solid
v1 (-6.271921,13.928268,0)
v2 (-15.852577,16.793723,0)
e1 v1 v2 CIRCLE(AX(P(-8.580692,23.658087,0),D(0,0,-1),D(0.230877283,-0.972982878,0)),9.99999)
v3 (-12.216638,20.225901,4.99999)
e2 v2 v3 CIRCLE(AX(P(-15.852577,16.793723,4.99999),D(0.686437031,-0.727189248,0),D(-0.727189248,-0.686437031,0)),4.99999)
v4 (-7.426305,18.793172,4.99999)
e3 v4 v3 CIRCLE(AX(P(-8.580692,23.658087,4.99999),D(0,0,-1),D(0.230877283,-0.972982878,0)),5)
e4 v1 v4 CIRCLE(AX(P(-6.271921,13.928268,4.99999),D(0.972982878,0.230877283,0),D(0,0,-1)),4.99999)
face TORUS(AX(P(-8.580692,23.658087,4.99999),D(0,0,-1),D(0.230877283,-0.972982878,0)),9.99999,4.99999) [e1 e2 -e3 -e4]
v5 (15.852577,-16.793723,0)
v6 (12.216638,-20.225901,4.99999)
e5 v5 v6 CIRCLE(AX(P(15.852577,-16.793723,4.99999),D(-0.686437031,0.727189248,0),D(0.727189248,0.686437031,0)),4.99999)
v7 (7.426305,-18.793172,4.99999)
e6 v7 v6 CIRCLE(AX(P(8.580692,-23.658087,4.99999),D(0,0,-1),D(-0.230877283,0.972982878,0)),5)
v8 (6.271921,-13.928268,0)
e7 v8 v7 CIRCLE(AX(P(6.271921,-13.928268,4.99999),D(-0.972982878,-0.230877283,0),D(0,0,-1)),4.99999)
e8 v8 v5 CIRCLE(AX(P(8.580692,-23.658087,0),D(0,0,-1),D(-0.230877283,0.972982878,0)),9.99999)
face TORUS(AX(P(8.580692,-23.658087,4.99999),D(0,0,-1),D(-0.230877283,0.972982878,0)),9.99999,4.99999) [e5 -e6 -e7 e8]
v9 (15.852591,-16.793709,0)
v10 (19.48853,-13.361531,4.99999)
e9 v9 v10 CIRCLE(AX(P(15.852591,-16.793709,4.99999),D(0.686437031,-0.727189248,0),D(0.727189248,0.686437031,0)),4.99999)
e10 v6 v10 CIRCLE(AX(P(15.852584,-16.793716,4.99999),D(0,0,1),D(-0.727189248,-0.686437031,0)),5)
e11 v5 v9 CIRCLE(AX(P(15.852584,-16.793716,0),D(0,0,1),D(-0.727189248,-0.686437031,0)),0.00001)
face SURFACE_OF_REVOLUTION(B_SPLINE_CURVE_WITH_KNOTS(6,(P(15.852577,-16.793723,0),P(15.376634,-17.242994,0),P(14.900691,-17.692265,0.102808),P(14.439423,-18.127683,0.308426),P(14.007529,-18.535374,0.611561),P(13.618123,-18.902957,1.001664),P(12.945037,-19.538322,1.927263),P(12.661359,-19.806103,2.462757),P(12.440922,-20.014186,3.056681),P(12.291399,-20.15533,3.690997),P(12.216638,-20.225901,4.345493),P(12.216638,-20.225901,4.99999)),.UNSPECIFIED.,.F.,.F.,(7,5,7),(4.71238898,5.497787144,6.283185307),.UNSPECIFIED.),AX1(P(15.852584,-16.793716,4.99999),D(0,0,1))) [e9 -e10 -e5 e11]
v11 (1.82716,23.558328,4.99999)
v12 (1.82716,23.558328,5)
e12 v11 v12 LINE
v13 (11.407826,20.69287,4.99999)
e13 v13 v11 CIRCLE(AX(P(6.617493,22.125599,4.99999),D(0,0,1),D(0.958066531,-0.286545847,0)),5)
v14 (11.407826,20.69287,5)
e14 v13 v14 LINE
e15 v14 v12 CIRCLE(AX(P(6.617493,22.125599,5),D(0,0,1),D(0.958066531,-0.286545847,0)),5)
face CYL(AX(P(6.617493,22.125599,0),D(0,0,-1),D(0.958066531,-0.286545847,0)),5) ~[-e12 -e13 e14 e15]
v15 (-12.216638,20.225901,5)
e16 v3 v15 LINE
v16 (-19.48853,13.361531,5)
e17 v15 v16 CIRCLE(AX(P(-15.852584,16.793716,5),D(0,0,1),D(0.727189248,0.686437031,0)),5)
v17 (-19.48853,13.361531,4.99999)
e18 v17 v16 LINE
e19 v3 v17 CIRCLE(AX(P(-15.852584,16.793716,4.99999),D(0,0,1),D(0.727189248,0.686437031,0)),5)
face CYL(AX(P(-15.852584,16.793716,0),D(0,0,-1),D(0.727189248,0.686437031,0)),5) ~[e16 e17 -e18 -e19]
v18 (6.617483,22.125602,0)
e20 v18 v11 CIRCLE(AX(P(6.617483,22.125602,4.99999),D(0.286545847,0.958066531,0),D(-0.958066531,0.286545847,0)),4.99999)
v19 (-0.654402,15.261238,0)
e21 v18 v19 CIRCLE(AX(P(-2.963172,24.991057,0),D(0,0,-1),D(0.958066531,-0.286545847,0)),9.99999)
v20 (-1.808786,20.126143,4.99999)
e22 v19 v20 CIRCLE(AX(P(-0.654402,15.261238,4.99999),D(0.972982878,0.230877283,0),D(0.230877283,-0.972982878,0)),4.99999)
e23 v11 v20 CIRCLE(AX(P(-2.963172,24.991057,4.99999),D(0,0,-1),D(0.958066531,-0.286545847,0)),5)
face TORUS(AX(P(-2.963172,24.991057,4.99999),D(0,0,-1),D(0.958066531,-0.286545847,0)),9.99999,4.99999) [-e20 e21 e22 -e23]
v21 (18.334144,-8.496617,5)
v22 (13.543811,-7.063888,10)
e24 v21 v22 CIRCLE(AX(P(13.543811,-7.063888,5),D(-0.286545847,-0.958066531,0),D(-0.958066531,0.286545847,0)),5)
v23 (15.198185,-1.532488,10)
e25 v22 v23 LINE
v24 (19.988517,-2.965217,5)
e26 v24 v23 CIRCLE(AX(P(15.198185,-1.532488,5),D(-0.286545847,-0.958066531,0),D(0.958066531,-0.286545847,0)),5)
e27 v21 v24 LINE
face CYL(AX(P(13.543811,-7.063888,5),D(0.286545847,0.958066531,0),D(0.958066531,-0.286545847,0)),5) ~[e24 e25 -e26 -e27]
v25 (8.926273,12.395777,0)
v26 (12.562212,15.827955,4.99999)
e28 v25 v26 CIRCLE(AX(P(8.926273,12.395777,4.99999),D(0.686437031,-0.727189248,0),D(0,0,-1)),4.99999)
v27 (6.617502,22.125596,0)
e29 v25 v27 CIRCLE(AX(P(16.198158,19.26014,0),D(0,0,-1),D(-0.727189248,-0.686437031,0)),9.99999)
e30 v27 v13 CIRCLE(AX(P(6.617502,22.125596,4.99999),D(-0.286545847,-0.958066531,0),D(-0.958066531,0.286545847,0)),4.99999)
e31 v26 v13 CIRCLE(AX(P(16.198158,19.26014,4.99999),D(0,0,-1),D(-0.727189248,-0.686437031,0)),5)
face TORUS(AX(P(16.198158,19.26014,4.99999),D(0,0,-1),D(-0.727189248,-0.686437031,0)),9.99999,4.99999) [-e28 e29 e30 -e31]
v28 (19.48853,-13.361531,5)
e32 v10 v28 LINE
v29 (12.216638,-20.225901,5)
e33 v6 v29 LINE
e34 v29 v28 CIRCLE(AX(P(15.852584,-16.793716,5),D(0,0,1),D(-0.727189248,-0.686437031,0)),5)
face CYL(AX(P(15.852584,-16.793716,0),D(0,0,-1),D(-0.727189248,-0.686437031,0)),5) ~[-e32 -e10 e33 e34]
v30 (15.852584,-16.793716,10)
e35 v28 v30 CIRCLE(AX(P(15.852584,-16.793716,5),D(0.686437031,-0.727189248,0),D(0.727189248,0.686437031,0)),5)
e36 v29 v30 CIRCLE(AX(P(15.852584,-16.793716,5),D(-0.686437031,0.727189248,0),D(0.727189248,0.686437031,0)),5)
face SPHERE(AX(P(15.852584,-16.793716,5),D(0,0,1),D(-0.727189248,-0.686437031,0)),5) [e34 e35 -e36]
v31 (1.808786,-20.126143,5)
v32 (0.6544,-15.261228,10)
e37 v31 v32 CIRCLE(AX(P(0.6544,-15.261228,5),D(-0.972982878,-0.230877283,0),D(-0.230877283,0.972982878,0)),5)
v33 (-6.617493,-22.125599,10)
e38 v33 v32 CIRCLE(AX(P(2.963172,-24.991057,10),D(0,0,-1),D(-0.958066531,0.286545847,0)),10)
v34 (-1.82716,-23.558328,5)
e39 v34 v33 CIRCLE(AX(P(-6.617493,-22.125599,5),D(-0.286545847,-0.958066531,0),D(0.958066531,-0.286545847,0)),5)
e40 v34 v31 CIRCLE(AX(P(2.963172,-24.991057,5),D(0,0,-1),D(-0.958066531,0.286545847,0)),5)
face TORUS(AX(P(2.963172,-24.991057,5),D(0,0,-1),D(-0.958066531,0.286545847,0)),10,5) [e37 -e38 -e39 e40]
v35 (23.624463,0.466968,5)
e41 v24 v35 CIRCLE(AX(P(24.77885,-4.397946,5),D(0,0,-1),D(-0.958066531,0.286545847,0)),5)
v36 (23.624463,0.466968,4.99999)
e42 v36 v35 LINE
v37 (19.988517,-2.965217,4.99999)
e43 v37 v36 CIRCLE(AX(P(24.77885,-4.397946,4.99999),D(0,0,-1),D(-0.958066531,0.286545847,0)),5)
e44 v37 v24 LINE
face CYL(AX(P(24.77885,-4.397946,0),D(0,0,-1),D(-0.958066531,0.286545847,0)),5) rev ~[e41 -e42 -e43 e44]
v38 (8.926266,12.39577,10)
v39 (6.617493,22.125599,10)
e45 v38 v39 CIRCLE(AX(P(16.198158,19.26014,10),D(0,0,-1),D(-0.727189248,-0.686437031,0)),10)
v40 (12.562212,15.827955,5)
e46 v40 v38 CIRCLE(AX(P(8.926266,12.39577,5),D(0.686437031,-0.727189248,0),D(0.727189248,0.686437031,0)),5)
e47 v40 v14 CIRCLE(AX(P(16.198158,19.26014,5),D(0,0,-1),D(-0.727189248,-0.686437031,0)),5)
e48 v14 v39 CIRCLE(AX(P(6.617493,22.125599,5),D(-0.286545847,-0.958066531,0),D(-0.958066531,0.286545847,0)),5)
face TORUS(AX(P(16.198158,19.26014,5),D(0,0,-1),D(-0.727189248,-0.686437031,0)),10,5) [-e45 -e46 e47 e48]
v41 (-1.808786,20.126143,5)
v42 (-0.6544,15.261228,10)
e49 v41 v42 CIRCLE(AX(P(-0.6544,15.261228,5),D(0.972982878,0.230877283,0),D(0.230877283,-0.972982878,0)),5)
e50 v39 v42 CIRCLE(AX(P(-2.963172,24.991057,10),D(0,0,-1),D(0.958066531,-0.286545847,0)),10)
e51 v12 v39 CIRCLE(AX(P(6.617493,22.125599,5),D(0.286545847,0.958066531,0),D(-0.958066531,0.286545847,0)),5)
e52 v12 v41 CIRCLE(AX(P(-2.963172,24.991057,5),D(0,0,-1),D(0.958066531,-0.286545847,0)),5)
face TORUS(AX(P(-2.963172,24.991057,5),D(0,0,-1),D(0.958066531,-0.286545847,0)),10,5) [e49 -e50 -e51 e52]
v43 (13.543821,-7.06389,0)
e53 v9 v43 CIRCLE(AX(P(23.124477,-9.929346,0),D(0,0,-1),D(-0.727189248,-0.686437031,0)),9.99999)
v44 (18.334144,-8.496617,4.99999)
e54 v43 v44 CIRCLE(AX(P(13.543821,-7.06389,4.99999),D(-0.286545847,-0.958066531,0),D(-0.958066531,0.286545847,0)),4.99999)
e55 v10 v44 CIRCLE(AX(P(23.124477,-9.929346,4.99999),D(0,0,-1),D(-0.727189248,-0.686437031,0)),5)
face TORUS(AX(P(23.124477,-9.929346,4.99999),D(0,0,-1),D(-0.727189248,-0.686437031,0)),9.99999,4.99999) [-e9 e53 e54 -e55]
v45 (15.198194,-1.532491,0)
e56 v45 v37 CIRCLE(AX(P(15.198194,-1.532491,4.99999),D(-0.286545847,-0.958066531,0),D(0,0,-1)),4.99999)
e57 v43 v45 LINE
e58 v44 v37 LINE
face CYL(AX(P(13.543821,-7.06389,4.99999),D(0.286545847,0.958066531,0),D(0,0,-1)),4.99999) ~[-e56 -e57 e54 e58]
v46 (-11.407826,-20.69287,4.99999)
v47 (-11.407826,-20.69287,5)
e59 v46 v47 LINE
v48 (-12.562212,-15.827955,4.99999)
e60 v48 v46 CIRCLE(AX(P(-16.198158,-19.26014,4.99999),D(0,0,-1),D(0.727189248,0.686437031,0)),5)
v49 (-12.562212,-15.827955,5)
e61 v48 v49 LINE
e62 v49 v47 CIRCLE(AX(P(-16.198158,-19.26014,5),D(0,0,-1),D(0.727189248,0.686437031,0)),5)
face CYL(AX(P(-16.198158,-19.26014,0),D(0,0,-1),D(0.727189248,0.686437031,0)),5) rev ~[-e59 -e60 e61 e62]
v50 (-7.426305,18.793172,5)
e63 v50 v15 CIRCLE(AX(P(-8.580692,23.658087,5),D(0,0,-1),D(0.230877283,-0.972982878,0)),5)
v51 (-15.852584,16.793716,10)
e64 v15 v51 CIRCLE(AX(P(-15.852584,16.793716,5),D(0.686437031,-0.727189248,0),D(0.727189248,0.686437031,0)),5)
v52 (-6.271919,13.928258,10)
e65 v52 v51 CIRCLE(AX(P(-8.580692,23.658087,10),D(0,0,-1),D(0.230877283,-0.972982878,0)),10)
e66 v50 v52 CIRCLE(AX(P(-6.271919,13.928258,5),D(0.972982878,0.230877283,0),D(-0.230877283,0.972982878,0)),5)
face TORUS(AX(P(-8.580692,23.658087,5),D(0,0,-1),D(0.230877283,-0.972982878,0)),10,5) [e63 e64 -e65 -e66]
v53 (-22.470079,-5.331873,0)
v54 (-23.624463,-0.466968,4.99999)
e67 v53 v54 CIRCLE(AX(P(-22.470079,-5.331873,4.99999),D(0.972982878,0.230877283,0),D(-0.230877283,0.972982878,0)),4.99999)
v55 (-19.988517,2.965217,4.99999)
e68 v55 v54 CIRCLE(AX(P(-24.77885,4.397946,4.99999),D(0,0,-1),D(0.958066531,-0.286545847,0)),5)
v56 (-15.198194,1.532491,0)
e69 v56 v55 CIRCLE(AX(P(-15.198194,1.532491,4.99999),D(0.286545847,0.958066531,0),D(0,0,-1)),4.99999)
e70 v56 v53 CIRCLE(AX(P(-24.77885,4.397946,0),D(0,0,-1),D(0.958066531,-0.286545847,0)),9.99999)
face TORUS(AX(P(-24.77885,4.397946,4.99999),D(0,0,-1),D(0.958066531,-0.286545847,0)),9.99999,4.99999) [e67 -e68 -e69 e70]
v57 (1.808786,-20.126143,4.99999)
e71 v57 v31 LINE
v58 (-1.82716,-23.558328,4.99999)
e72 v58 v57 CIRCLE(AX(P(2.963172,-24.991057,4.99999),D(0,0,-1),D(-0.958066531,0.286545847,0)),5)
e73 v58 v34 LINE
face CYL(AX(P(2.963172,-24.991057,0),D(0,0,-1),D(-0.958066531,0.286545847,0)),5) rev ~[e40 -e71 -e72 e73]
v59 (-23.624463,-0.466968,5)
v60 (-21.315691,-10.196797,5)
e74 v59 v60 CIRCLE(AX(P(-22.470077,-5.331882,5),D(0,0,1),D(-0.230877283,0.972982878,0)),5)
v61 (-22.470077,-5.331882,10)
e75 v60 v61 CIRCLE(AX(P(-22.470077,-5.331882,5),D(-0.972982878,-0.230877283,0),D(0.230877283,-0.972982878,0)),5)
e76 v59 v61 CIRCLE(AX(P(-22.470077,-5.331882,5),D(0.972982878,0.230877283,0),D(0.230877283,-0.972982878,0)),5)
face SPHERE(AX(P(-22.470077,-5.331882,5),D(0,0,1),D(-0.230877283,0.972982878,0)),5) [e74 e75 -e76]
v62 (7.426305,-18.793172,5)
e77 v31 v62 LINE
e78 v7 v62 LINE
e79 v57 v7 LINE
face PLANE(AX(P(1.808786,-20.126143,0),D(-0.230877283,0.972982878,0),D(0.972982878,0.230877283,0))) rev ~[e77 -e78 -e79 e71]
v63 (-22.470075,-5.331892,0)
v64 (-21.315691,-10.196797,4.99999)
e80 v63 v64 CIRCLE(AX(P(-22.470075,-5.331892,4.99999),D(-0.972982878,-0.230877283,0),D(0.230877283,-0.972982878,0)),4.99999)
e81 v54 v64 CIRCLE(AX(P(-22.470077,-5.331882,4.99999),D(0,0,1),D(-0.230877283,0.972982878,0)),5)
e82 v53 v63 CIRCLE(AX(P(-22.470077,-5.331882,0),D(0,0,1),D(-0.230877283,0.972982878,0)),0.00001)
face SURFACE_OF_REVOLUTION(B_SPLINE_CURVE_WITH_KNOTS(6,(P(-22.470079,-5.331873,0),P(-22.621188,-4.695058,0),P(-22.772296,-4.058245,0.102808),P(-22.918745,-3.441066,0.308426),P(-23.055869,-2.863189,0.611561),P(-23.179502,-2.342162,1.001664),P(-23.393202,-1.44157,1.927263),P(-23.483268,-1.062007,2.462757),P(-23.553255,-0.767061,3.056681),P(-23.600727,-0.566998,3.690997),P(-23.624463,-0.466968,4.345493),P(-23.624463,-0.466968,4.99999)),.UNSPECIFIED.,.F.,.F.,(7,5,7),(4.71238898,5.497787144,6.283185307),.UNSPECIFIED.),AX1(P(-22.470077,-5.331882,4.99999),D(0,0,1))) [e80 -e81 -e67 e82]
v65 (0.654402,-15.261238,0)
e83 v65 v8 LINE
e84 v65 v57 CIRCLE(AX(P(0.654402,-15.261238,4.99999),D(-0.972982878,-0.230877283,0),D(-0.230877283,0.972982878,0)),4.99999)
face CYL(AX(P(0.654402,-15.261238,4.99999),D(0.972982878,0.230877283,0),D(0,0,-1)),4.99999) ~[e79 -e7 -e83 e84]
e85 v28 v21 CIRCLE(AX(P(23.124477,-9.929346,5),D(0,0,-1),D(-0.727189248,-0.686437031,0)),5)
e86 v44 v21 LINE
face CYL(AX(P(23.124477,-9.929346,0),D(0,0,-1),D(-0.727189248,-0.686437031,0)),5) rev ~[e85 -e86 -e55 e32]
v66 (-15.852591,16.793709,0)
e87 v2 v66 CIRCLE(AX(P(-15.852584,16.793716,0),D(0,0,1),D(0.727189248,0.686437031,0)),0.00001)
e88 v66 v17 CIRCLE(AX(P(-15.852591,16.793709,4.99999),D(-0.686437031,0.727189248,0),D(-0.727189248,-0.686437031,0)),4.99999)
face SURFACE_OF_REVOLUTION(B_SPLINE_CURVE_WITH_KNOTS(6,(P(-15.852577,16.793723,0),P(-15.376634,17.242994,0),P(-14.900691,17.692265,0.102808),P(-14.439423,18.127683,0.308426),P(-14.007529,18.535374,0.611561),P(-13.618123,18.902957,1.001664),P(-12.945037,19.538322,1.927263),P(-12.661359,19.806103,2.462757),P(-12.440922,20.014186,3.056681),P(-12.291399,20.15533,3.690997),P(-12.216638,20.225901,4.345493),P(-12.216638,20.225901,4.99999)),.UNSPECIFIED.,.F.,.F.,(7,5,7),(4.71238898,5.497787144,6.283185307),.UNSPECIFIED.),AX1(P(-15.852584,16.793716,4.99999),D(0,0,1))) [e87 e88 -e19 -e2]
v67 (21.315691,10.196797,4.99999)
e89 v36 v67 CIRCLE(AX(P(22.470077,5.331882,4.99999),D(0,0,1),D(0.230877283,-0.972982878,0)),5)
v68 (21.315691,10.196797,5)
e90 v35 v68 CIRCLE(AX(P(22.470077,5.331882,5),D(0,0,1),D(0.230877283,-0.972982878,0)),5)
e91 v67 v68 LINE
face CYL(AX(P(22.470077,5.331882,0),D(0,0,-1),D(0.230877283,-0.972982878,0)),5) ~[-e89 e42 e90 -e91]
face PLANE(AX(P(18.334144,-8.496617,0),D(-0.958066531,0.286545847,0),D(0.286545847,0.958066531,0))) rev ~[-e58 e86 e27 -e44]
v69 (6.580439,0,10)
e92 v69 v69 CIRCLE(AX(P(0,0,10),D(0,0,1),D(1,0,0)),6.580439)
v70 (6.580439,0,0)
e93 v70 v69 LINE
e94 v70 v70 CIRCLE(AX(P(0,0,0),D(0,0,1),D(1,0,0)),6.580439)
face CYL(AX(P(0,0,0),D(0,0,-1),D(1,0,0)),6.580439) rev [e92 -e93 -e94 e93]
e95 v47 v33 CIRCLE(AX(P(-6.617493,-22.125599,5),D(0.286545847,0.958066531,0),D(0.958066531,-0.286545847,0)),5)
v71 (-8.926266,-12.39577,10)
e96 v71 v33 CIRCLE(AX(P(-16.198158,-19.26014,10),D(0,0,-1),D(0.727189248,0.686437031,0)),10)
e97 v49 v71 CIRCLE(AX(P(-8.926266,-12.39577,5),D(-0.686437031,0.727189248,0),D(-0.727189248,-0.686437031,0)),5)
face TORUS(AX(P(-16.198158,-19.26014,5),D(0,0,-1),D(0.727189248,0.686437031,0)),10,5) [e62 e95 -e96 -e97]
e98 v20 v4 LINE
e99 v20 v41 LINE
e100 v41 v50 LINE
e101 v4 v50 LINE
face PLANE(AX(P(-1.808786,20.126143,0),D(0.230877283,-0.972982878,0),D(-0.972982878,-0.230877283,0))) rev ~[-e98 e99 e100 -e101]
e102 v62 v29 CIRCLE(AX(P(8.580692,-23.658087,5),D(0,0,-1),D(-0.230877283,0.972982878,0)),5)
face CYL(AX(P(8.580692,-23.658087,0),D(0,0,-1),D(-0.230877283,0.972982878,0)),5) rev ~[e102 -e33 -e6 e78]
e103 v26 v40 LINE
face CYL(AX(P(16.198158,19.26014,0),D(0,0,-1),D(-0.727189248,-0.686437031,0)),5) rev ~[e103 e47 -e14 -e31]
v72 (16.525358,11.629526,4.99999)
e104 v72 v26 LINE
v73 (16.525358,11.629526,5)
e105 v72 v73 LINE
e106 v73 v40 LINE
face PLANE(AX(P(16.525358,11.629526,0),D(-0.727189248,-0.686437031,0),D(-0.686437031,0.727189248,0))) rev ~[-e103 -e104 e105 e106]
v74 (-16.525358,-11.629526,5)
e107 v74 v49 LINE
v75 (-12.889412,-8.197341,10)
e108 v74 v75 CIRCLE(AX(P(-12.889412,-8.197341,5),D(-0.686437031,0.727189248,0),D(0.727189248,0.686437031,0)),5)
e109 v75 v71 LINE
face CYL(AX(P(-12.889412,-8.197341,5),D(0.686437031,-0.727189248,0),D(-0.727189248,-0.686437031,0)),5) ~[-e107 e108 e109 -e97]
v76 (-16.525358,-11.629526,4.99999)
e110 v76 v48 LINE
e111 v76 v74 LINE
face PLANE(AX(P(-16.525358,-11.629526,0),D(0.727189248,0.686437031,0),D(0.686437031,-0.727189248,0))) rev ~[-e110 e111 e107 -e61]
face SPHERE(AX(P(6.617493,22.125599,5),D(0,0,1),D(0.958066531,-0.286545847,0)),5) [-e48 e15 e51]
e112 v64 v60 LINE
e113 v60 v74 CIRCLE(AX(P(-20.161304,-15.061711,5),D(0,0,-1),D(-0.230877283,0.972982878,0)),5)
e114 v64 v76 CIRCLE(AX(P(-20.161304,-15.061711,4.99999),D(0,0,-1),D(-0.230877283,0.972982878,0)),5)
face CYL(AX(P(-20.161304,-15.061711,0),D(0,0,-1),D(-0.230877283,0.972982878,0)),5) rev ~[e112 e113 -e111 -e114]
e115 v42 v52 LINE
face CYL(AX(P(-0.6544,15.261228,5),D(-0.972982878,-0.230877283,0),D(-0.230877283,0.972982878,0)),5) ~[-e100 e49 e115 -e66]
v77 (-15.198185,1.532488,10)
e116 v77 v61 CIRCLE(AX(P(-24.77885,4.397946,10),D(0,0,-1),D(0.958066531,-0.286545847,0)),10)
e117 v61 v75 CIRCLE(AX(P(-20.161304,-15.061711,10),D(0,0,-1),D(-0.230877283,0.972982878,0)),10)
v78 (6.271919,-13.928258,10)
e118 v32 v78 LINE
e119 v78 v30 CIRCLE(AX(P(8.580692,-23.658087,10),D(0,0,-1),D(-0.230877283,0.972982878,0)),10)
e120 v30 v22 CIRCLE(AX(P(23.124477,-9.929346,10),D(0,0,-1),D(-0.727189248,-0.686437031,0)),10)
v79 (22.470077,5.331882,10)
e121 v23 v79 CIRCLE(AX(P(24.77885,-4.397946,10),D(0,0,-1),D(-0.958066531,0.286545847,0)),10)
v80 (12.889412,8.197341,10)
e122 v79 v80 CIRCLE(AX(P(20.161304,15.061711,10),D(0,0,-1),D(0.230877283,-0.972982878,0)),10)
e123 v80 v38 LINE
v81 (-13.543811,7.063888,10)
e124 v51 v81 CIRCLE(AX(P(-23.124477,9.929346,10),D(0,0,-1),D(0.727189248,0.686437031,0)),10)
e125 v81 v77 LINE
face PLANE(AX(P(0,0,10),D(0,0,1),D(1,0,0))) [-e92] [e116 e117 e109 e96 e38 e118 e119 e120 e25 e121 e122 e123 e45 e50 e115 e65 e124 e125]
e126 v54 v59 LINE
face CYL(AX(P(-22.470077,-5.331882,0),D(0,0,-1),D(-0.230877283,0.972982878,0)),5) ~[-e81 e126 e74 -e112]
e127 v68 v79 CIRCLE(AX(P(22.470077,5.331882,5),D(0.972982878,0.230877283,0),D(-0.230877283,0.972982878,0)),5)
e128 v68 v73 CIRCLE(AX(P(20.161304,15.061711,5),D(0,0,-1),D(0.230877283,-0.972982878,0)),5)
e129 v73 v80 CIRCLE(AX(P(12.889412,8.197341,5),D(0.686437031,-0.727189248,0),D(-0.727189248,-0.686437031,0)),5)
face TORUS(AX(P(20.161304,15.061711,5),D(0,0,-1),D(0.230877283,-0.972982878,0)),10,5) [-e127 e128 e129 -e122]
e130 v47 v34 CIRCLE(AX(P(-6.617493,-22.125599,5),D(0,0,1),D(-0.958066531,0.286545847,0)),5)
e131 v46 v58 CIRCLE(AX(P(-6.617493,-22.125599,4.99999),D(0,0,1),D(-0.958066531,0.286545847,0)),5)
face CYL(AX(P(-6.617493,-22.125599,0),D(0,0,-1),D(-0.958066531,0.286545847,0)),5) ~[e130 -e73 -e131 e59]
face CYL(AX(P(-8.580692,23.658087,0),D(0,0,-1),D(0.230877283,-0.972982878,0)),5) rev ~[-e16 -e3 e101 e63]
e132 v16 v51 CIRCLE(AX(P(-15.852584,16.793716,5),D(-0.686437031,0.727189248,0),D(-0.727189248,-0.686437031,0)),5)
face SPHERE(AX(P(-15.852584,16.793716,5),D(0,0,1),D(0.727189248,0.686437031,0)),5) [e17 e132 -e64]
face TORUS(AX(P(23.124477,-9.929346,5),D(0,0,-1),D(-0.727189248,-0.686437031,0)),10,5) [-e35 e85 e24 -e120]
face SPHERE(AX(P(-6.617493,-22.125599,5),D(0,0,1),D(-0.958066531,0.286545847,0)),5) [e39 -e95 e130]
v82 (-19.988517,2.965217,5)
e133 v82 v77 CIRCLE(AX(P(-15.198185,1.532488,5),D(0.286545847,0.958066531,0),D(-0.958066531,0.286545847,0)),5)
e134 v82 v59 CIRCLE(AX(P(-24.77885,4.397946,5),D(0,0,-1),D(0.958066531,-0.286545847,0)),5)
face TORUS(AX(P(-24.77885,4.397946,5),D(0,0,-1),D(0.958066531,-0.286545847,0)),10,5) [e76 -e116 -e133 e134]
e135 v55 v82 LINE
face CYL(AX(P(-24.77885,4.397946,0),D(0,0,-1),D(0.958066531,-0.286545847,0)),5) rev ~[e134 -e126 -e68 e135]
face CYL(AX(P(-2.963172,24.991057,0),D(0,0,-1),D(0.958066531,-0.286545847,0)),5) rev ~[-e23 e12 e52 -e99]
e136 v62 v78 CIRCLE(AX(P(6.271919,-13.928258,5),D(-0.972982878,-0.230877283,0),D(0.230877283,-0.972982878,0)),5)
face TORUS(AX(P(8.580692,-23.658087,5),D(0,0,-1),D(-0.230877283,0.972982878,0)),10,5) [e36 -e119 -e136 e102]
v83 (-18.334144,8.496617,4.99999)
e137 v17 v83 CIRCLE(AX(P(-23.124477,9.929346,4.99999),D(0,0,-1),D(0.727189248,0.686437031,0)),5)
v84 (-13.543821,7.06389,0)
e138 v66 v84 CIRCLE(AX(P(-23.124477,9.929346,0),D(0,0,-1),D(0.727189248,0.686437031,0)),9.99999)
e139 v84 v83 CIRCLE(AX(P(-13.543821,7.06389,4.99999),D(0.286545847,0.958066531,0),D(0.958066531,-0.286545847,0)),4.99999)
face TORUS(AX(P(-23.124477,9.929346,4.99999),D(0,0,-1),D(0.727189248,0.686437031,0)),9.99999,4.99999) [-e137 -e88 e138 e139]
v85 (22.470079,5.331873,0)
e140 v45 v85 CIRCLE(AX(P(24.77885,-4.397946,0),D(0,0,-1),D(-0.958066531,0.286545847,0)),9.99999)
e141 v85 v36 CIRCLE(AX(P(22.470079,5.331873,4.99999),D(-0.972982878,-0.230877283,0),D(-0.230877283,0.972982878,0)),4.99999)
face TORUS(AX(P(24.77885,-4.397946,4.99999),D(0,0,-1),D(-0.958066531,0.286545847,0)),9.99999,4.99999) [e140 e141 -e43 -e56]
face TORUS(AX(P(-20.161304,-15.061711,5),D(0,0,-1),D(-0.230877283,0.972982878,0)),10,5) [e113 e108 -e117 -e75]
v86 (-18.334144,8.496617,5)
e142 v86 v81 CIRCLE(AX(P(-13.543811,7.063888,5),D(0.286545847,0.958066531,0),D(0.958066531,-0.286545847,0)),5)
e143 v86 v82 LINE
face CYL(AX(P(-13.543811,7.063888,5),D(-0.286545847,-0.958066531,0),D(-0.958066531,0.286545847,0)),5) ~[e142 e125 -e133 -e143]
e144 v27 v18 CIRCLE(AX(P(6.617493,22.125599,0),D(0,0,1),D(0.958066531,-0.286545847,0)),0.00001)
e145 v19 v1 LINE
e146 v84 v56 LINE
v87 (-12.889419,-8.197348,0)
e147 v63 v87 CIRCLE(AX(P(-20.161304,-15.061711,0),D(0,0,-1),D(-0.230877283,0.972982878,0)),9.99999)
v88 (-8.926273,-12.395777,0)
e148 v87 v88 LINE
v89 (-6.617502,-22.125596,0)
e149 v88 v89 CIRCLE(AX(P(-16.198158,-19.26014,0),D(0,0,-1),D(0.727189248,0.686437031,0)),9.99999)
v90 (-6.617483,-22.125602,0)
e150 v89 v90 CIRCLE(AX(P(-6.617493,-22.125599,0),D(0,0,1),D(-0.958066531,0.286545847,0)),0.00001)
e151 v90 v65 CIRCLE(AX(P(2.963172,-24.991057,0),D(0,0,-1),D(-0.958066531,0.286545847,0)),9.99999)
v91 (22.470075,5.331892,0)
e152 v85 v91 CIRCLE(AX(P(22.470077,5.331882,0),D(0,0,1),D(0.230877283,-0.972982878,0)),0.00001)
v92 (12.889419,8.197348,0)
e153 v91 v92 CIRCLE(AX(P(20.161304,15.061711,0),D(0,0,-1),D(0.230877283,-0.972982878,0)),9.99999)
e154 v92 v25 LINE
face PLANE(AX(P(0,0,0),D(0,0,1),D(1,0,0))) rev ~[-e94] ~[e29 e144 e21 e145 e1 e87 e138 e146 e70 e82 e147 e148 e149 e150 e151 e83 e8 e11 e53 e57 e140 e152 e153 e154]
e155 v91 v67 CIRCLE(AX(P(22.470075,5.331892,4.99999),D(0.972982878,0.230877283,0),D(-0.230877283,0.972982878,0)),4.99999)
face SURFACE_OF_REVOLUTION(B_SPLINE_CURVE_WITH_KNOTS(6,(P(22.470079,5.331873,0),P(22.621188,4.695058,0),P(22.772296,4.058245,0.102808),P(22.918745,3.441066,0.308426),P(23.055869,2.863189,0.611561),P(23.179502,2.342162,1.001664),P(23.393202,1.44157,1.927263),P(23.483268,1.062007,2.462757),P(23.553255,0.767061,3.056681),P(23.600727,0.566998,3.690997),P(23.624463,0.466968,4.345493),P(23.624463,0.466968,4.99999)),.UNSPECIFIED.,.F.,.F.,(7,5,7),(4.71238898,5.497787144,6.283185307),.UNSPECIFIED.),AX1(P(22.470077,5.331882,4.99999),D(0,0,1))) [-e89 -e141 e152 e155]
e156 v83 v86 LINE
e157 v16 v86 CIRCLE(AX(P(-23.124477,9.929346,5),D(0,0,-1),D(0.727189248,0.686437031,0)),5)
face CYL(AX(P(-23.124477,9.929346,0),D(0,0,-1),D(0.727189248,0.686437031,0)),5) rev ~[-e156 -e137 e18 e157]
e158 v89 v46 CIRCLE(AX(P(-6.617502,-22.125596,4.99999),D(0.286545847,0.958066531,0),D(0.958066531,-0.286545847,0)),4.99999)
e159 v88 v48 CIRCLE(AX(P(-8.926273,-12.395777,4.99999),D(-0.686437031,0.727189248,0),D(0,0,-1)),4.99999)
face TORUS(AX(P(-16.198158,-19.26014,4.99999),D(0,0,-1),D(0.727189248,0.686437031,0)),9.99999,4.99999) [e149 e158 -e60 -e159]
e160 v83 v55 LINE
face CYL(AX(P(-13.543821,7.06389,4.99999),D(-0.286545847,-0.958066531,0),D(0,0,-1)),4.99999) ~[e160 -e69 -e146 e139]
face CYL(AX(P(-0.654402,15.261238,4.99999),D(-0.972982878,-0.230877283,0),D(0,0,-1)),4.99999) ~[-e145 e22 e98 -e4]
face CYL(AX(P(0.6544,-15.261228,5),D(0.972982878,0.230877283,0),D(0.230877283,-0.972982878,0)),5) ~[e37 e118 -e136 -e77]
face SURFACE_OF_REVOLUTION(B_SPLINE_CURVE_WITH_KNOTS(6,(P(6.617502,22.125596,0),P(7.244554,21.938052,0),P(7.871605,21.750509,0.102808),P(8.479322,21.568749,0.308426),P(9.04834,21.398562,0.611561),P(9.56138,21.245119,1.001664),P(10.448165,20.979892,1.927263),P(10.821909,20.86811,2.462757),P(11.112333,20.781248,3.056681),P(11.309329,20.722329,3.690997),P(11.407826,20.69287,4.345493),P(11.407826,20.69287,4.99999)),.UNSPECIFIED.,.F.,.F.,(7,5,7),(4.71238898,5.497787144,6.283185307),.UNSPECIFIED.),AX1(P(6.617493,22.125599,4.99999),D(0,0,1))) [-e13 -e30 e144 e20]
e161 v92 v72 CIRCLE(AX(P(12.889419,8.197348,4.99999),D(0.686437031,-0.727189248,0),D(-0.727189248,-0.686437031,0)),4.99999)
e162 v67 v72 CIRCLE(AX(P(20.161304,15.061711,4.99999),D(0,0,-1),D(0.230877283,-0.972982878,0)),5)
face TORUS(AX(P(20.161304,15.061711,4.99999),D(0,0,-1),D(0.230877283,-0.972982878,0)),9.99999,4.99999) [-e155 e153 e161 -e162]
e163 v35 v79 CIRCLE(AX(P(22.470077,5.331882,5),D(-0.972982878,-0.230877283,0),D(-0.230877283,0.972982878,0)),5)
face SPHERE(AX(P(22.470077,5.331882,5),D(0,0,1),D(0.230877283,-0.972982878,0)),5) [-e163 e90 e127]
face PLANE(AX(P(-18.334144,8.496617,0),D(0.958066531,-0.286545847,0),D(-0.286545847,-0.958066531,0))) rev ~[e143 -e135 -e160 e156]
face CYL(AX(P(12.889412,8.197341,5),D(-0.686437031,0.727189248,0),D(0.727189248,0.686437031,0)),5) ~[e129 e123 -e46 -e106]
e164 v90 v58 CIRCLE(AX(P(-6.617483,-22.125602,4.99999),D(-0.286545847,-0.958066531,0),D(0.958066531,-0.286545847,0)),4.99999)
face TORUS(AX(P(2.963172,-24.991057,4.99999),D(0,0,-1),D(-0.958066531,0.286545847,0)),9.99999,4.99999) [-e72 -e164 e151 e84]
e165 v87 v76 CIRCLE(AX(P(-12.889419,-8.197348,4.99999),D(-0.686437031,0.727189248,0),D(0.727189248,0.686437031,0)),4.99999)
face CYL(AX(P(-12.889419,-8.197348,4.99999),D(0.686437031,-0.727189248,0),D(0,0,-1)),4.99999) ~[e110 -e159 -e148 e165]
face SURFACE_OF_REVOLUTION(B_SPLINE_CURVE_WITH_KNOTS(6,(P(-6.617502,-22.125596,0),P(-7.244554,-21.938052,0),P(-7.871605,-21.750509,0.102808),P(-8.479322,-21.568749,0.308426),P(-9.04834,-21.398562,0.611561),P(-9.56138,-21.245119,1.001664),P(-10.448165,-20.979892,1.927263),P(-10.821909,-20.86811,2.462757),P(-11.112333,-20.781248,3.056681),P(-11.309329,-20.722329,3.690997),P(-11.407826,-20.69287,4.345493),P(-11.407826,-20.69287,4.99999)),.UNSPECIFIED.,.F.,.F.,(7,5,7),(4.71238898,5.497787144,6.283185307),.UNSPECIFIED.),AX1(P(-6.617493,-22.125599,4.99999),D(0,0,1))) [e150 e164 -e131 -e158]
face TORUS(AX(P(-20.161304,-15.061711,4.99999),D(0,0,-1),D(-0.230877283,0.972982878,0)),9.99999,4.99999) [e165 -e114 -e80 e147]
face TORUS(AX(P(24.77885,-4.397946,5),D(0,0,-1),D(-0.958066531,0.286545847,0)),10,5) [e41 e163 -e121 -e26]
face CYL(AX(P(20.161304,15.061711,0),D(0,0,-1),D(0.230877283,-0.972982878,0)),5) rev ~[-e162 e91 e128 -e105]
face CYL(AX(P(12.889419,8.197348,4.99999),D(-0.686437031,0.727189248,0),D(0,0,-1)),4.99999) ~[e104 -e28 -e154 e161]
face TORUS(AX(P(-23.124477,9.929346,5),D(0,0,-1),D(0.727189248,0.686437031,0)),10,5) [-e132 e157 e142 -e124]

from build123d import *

# Parameters (mm, degrees)
F0_R     = 6.5804391212
F1_DEPTH = 10
F2_R     = 5
F3_R     = 4.99999


# Not quite as in the source:
# - a fillet or chamfer is up to 0.001 mm smaller than in the source, because OpenCascade refuses the exact size


with BuildPart() as f1:
    # F0 (on Top) → F1 (new body)
    with BuildSketch(Plane.XY):
        with BuildLine():
            Line((-1.8087860254, 20.1261428607), (-7.4263052889, 18.7931722466))
            ThreePointArc((-7.4263052889, 18.7931722466), (-10.0134209368, 18.8677539802), (-12.2166379436, 20.2259014802))
            ThreePointArc((-12.2166379436, 20.2259014802), (-19.2847693388, 20.4296625659), (-19.4885304245, 13.3615311707))
            ThreePointArc((-19.4885304245, 13.3615311707), (-18.2595622766, 11.0837324302), (-18.3341440102, 8.4966167823))
            Line((-18.3341440102, 8.4966167823), (-19.9885172277, 2.9652170869))
            ThreePointArc((-19.9885172277, 2.9652170869), (-21.3466647277, 0.7620000801), (-23.6244634681, -0.4669680679))
            ThreePointArc((-23.6244634681, -0.4669680679), (-27.3349914422, -6.4862688706), (-21.3156906395, -10.1967968447))
            ThreePointArc((-21.3156906395, -10.1967968447), (-18.7285749916, -10.2713785784), (-16.5253579848, -11.6295260784))
            Line((-16.5253579848, -11.6295260784), (-12.5622119388, -15.8279551597))
            ThreePointArc((-12.5622119388, -15.8279551597), (-11.3332437908, -18.1057539002), (-11.4078255245, -20.6928695481))
            ThreePointArc((-11.4078255245, -20.6928695481), (-8.0502221034, -26.9159314365), (-1.827160215, -23.5583280154))
            ThreePointArc((-1.827160215, -23.5583280154), (-0.469012715, -21.3551110086), (1.8087860254, -20.1261428607))
            Line((1.8087860254, -20.1261428607), (7.4263052889, -18.7931722466))
            ThreePointArc((7.4263052889, -18.7931722466), (10.0134209368, -18.8677539802), (12.2166379436, -20.2259014802))
            ThreePointArc((12.2166379436, -20.2259014802), (19.2847693388, -20.4296625659), (19.4885304245, -13.3615311707))
            ThreePointArc((19.4885304245, -13.3615311707), (18.2595622766, -11.0837324302), (18.3341440102, -8.4966167823))
            Line((18.3341440102, -8.4966167823), (19.9885172277, -2.9652170869))
            ThreePointArc((19.9885172277, -2.9652170869), (21.3466647277, -0.7620000801), (23.6244634681, 0.4669680679))
            ThreePointArc((23.6244634681, 0.4669680679), (27.3349914422, 6.4862688706), (21.3156906395, 10.1967968447))
            ThreePointArc((21.3156906395, 10.1967968447), (18.7285749916, 10.2713785784), (16.5253579848, 11.6295260784))
            Line((16.5253579848, 11.6295260784), (12.5622119388, 15.8279551597))
            ThreePointArc((12.5622119388, 15.8279551597), (11.3332437908, 18.1057539002), (11.4078255245, 20.6928695481))
            ThreePointArc((11.4078255245, 20.6928695481), (8.0502221034, 26.9159314365), (1.827160215, 23.5583280154))
            ThreePointArc((1.827160215, 23.5583280154), (0.469012715, 21.3551110086), (-1.8087860254, 20.1261428607))
        make_face()
        Circle(F0_R, mode=Mode.SUBTRACT)
    extrude(amount=F1_DEPTH)

    # F2
    f2_edges = [f1.edges().sort_by_distance(p)[0] for p in [
        (-19.284769, 20.429663, 10),
        (-10.013421, 18.867754, 10),
        (-4.617546, 19.459658, 10),
    ]]
    fillet(f2_edges, radius=F2_R)

    # F3 (radius 5 in the source; OpenCascade refuses exactly that, so slightly less here)
    f3_edges = [f1.edges().sort_by_distance(p)[0] for p in [
        (-27.334991, -6.486269, 0),
    ]]
    fillet(f3_edges, radius=F3_R)


solid = f1.part
